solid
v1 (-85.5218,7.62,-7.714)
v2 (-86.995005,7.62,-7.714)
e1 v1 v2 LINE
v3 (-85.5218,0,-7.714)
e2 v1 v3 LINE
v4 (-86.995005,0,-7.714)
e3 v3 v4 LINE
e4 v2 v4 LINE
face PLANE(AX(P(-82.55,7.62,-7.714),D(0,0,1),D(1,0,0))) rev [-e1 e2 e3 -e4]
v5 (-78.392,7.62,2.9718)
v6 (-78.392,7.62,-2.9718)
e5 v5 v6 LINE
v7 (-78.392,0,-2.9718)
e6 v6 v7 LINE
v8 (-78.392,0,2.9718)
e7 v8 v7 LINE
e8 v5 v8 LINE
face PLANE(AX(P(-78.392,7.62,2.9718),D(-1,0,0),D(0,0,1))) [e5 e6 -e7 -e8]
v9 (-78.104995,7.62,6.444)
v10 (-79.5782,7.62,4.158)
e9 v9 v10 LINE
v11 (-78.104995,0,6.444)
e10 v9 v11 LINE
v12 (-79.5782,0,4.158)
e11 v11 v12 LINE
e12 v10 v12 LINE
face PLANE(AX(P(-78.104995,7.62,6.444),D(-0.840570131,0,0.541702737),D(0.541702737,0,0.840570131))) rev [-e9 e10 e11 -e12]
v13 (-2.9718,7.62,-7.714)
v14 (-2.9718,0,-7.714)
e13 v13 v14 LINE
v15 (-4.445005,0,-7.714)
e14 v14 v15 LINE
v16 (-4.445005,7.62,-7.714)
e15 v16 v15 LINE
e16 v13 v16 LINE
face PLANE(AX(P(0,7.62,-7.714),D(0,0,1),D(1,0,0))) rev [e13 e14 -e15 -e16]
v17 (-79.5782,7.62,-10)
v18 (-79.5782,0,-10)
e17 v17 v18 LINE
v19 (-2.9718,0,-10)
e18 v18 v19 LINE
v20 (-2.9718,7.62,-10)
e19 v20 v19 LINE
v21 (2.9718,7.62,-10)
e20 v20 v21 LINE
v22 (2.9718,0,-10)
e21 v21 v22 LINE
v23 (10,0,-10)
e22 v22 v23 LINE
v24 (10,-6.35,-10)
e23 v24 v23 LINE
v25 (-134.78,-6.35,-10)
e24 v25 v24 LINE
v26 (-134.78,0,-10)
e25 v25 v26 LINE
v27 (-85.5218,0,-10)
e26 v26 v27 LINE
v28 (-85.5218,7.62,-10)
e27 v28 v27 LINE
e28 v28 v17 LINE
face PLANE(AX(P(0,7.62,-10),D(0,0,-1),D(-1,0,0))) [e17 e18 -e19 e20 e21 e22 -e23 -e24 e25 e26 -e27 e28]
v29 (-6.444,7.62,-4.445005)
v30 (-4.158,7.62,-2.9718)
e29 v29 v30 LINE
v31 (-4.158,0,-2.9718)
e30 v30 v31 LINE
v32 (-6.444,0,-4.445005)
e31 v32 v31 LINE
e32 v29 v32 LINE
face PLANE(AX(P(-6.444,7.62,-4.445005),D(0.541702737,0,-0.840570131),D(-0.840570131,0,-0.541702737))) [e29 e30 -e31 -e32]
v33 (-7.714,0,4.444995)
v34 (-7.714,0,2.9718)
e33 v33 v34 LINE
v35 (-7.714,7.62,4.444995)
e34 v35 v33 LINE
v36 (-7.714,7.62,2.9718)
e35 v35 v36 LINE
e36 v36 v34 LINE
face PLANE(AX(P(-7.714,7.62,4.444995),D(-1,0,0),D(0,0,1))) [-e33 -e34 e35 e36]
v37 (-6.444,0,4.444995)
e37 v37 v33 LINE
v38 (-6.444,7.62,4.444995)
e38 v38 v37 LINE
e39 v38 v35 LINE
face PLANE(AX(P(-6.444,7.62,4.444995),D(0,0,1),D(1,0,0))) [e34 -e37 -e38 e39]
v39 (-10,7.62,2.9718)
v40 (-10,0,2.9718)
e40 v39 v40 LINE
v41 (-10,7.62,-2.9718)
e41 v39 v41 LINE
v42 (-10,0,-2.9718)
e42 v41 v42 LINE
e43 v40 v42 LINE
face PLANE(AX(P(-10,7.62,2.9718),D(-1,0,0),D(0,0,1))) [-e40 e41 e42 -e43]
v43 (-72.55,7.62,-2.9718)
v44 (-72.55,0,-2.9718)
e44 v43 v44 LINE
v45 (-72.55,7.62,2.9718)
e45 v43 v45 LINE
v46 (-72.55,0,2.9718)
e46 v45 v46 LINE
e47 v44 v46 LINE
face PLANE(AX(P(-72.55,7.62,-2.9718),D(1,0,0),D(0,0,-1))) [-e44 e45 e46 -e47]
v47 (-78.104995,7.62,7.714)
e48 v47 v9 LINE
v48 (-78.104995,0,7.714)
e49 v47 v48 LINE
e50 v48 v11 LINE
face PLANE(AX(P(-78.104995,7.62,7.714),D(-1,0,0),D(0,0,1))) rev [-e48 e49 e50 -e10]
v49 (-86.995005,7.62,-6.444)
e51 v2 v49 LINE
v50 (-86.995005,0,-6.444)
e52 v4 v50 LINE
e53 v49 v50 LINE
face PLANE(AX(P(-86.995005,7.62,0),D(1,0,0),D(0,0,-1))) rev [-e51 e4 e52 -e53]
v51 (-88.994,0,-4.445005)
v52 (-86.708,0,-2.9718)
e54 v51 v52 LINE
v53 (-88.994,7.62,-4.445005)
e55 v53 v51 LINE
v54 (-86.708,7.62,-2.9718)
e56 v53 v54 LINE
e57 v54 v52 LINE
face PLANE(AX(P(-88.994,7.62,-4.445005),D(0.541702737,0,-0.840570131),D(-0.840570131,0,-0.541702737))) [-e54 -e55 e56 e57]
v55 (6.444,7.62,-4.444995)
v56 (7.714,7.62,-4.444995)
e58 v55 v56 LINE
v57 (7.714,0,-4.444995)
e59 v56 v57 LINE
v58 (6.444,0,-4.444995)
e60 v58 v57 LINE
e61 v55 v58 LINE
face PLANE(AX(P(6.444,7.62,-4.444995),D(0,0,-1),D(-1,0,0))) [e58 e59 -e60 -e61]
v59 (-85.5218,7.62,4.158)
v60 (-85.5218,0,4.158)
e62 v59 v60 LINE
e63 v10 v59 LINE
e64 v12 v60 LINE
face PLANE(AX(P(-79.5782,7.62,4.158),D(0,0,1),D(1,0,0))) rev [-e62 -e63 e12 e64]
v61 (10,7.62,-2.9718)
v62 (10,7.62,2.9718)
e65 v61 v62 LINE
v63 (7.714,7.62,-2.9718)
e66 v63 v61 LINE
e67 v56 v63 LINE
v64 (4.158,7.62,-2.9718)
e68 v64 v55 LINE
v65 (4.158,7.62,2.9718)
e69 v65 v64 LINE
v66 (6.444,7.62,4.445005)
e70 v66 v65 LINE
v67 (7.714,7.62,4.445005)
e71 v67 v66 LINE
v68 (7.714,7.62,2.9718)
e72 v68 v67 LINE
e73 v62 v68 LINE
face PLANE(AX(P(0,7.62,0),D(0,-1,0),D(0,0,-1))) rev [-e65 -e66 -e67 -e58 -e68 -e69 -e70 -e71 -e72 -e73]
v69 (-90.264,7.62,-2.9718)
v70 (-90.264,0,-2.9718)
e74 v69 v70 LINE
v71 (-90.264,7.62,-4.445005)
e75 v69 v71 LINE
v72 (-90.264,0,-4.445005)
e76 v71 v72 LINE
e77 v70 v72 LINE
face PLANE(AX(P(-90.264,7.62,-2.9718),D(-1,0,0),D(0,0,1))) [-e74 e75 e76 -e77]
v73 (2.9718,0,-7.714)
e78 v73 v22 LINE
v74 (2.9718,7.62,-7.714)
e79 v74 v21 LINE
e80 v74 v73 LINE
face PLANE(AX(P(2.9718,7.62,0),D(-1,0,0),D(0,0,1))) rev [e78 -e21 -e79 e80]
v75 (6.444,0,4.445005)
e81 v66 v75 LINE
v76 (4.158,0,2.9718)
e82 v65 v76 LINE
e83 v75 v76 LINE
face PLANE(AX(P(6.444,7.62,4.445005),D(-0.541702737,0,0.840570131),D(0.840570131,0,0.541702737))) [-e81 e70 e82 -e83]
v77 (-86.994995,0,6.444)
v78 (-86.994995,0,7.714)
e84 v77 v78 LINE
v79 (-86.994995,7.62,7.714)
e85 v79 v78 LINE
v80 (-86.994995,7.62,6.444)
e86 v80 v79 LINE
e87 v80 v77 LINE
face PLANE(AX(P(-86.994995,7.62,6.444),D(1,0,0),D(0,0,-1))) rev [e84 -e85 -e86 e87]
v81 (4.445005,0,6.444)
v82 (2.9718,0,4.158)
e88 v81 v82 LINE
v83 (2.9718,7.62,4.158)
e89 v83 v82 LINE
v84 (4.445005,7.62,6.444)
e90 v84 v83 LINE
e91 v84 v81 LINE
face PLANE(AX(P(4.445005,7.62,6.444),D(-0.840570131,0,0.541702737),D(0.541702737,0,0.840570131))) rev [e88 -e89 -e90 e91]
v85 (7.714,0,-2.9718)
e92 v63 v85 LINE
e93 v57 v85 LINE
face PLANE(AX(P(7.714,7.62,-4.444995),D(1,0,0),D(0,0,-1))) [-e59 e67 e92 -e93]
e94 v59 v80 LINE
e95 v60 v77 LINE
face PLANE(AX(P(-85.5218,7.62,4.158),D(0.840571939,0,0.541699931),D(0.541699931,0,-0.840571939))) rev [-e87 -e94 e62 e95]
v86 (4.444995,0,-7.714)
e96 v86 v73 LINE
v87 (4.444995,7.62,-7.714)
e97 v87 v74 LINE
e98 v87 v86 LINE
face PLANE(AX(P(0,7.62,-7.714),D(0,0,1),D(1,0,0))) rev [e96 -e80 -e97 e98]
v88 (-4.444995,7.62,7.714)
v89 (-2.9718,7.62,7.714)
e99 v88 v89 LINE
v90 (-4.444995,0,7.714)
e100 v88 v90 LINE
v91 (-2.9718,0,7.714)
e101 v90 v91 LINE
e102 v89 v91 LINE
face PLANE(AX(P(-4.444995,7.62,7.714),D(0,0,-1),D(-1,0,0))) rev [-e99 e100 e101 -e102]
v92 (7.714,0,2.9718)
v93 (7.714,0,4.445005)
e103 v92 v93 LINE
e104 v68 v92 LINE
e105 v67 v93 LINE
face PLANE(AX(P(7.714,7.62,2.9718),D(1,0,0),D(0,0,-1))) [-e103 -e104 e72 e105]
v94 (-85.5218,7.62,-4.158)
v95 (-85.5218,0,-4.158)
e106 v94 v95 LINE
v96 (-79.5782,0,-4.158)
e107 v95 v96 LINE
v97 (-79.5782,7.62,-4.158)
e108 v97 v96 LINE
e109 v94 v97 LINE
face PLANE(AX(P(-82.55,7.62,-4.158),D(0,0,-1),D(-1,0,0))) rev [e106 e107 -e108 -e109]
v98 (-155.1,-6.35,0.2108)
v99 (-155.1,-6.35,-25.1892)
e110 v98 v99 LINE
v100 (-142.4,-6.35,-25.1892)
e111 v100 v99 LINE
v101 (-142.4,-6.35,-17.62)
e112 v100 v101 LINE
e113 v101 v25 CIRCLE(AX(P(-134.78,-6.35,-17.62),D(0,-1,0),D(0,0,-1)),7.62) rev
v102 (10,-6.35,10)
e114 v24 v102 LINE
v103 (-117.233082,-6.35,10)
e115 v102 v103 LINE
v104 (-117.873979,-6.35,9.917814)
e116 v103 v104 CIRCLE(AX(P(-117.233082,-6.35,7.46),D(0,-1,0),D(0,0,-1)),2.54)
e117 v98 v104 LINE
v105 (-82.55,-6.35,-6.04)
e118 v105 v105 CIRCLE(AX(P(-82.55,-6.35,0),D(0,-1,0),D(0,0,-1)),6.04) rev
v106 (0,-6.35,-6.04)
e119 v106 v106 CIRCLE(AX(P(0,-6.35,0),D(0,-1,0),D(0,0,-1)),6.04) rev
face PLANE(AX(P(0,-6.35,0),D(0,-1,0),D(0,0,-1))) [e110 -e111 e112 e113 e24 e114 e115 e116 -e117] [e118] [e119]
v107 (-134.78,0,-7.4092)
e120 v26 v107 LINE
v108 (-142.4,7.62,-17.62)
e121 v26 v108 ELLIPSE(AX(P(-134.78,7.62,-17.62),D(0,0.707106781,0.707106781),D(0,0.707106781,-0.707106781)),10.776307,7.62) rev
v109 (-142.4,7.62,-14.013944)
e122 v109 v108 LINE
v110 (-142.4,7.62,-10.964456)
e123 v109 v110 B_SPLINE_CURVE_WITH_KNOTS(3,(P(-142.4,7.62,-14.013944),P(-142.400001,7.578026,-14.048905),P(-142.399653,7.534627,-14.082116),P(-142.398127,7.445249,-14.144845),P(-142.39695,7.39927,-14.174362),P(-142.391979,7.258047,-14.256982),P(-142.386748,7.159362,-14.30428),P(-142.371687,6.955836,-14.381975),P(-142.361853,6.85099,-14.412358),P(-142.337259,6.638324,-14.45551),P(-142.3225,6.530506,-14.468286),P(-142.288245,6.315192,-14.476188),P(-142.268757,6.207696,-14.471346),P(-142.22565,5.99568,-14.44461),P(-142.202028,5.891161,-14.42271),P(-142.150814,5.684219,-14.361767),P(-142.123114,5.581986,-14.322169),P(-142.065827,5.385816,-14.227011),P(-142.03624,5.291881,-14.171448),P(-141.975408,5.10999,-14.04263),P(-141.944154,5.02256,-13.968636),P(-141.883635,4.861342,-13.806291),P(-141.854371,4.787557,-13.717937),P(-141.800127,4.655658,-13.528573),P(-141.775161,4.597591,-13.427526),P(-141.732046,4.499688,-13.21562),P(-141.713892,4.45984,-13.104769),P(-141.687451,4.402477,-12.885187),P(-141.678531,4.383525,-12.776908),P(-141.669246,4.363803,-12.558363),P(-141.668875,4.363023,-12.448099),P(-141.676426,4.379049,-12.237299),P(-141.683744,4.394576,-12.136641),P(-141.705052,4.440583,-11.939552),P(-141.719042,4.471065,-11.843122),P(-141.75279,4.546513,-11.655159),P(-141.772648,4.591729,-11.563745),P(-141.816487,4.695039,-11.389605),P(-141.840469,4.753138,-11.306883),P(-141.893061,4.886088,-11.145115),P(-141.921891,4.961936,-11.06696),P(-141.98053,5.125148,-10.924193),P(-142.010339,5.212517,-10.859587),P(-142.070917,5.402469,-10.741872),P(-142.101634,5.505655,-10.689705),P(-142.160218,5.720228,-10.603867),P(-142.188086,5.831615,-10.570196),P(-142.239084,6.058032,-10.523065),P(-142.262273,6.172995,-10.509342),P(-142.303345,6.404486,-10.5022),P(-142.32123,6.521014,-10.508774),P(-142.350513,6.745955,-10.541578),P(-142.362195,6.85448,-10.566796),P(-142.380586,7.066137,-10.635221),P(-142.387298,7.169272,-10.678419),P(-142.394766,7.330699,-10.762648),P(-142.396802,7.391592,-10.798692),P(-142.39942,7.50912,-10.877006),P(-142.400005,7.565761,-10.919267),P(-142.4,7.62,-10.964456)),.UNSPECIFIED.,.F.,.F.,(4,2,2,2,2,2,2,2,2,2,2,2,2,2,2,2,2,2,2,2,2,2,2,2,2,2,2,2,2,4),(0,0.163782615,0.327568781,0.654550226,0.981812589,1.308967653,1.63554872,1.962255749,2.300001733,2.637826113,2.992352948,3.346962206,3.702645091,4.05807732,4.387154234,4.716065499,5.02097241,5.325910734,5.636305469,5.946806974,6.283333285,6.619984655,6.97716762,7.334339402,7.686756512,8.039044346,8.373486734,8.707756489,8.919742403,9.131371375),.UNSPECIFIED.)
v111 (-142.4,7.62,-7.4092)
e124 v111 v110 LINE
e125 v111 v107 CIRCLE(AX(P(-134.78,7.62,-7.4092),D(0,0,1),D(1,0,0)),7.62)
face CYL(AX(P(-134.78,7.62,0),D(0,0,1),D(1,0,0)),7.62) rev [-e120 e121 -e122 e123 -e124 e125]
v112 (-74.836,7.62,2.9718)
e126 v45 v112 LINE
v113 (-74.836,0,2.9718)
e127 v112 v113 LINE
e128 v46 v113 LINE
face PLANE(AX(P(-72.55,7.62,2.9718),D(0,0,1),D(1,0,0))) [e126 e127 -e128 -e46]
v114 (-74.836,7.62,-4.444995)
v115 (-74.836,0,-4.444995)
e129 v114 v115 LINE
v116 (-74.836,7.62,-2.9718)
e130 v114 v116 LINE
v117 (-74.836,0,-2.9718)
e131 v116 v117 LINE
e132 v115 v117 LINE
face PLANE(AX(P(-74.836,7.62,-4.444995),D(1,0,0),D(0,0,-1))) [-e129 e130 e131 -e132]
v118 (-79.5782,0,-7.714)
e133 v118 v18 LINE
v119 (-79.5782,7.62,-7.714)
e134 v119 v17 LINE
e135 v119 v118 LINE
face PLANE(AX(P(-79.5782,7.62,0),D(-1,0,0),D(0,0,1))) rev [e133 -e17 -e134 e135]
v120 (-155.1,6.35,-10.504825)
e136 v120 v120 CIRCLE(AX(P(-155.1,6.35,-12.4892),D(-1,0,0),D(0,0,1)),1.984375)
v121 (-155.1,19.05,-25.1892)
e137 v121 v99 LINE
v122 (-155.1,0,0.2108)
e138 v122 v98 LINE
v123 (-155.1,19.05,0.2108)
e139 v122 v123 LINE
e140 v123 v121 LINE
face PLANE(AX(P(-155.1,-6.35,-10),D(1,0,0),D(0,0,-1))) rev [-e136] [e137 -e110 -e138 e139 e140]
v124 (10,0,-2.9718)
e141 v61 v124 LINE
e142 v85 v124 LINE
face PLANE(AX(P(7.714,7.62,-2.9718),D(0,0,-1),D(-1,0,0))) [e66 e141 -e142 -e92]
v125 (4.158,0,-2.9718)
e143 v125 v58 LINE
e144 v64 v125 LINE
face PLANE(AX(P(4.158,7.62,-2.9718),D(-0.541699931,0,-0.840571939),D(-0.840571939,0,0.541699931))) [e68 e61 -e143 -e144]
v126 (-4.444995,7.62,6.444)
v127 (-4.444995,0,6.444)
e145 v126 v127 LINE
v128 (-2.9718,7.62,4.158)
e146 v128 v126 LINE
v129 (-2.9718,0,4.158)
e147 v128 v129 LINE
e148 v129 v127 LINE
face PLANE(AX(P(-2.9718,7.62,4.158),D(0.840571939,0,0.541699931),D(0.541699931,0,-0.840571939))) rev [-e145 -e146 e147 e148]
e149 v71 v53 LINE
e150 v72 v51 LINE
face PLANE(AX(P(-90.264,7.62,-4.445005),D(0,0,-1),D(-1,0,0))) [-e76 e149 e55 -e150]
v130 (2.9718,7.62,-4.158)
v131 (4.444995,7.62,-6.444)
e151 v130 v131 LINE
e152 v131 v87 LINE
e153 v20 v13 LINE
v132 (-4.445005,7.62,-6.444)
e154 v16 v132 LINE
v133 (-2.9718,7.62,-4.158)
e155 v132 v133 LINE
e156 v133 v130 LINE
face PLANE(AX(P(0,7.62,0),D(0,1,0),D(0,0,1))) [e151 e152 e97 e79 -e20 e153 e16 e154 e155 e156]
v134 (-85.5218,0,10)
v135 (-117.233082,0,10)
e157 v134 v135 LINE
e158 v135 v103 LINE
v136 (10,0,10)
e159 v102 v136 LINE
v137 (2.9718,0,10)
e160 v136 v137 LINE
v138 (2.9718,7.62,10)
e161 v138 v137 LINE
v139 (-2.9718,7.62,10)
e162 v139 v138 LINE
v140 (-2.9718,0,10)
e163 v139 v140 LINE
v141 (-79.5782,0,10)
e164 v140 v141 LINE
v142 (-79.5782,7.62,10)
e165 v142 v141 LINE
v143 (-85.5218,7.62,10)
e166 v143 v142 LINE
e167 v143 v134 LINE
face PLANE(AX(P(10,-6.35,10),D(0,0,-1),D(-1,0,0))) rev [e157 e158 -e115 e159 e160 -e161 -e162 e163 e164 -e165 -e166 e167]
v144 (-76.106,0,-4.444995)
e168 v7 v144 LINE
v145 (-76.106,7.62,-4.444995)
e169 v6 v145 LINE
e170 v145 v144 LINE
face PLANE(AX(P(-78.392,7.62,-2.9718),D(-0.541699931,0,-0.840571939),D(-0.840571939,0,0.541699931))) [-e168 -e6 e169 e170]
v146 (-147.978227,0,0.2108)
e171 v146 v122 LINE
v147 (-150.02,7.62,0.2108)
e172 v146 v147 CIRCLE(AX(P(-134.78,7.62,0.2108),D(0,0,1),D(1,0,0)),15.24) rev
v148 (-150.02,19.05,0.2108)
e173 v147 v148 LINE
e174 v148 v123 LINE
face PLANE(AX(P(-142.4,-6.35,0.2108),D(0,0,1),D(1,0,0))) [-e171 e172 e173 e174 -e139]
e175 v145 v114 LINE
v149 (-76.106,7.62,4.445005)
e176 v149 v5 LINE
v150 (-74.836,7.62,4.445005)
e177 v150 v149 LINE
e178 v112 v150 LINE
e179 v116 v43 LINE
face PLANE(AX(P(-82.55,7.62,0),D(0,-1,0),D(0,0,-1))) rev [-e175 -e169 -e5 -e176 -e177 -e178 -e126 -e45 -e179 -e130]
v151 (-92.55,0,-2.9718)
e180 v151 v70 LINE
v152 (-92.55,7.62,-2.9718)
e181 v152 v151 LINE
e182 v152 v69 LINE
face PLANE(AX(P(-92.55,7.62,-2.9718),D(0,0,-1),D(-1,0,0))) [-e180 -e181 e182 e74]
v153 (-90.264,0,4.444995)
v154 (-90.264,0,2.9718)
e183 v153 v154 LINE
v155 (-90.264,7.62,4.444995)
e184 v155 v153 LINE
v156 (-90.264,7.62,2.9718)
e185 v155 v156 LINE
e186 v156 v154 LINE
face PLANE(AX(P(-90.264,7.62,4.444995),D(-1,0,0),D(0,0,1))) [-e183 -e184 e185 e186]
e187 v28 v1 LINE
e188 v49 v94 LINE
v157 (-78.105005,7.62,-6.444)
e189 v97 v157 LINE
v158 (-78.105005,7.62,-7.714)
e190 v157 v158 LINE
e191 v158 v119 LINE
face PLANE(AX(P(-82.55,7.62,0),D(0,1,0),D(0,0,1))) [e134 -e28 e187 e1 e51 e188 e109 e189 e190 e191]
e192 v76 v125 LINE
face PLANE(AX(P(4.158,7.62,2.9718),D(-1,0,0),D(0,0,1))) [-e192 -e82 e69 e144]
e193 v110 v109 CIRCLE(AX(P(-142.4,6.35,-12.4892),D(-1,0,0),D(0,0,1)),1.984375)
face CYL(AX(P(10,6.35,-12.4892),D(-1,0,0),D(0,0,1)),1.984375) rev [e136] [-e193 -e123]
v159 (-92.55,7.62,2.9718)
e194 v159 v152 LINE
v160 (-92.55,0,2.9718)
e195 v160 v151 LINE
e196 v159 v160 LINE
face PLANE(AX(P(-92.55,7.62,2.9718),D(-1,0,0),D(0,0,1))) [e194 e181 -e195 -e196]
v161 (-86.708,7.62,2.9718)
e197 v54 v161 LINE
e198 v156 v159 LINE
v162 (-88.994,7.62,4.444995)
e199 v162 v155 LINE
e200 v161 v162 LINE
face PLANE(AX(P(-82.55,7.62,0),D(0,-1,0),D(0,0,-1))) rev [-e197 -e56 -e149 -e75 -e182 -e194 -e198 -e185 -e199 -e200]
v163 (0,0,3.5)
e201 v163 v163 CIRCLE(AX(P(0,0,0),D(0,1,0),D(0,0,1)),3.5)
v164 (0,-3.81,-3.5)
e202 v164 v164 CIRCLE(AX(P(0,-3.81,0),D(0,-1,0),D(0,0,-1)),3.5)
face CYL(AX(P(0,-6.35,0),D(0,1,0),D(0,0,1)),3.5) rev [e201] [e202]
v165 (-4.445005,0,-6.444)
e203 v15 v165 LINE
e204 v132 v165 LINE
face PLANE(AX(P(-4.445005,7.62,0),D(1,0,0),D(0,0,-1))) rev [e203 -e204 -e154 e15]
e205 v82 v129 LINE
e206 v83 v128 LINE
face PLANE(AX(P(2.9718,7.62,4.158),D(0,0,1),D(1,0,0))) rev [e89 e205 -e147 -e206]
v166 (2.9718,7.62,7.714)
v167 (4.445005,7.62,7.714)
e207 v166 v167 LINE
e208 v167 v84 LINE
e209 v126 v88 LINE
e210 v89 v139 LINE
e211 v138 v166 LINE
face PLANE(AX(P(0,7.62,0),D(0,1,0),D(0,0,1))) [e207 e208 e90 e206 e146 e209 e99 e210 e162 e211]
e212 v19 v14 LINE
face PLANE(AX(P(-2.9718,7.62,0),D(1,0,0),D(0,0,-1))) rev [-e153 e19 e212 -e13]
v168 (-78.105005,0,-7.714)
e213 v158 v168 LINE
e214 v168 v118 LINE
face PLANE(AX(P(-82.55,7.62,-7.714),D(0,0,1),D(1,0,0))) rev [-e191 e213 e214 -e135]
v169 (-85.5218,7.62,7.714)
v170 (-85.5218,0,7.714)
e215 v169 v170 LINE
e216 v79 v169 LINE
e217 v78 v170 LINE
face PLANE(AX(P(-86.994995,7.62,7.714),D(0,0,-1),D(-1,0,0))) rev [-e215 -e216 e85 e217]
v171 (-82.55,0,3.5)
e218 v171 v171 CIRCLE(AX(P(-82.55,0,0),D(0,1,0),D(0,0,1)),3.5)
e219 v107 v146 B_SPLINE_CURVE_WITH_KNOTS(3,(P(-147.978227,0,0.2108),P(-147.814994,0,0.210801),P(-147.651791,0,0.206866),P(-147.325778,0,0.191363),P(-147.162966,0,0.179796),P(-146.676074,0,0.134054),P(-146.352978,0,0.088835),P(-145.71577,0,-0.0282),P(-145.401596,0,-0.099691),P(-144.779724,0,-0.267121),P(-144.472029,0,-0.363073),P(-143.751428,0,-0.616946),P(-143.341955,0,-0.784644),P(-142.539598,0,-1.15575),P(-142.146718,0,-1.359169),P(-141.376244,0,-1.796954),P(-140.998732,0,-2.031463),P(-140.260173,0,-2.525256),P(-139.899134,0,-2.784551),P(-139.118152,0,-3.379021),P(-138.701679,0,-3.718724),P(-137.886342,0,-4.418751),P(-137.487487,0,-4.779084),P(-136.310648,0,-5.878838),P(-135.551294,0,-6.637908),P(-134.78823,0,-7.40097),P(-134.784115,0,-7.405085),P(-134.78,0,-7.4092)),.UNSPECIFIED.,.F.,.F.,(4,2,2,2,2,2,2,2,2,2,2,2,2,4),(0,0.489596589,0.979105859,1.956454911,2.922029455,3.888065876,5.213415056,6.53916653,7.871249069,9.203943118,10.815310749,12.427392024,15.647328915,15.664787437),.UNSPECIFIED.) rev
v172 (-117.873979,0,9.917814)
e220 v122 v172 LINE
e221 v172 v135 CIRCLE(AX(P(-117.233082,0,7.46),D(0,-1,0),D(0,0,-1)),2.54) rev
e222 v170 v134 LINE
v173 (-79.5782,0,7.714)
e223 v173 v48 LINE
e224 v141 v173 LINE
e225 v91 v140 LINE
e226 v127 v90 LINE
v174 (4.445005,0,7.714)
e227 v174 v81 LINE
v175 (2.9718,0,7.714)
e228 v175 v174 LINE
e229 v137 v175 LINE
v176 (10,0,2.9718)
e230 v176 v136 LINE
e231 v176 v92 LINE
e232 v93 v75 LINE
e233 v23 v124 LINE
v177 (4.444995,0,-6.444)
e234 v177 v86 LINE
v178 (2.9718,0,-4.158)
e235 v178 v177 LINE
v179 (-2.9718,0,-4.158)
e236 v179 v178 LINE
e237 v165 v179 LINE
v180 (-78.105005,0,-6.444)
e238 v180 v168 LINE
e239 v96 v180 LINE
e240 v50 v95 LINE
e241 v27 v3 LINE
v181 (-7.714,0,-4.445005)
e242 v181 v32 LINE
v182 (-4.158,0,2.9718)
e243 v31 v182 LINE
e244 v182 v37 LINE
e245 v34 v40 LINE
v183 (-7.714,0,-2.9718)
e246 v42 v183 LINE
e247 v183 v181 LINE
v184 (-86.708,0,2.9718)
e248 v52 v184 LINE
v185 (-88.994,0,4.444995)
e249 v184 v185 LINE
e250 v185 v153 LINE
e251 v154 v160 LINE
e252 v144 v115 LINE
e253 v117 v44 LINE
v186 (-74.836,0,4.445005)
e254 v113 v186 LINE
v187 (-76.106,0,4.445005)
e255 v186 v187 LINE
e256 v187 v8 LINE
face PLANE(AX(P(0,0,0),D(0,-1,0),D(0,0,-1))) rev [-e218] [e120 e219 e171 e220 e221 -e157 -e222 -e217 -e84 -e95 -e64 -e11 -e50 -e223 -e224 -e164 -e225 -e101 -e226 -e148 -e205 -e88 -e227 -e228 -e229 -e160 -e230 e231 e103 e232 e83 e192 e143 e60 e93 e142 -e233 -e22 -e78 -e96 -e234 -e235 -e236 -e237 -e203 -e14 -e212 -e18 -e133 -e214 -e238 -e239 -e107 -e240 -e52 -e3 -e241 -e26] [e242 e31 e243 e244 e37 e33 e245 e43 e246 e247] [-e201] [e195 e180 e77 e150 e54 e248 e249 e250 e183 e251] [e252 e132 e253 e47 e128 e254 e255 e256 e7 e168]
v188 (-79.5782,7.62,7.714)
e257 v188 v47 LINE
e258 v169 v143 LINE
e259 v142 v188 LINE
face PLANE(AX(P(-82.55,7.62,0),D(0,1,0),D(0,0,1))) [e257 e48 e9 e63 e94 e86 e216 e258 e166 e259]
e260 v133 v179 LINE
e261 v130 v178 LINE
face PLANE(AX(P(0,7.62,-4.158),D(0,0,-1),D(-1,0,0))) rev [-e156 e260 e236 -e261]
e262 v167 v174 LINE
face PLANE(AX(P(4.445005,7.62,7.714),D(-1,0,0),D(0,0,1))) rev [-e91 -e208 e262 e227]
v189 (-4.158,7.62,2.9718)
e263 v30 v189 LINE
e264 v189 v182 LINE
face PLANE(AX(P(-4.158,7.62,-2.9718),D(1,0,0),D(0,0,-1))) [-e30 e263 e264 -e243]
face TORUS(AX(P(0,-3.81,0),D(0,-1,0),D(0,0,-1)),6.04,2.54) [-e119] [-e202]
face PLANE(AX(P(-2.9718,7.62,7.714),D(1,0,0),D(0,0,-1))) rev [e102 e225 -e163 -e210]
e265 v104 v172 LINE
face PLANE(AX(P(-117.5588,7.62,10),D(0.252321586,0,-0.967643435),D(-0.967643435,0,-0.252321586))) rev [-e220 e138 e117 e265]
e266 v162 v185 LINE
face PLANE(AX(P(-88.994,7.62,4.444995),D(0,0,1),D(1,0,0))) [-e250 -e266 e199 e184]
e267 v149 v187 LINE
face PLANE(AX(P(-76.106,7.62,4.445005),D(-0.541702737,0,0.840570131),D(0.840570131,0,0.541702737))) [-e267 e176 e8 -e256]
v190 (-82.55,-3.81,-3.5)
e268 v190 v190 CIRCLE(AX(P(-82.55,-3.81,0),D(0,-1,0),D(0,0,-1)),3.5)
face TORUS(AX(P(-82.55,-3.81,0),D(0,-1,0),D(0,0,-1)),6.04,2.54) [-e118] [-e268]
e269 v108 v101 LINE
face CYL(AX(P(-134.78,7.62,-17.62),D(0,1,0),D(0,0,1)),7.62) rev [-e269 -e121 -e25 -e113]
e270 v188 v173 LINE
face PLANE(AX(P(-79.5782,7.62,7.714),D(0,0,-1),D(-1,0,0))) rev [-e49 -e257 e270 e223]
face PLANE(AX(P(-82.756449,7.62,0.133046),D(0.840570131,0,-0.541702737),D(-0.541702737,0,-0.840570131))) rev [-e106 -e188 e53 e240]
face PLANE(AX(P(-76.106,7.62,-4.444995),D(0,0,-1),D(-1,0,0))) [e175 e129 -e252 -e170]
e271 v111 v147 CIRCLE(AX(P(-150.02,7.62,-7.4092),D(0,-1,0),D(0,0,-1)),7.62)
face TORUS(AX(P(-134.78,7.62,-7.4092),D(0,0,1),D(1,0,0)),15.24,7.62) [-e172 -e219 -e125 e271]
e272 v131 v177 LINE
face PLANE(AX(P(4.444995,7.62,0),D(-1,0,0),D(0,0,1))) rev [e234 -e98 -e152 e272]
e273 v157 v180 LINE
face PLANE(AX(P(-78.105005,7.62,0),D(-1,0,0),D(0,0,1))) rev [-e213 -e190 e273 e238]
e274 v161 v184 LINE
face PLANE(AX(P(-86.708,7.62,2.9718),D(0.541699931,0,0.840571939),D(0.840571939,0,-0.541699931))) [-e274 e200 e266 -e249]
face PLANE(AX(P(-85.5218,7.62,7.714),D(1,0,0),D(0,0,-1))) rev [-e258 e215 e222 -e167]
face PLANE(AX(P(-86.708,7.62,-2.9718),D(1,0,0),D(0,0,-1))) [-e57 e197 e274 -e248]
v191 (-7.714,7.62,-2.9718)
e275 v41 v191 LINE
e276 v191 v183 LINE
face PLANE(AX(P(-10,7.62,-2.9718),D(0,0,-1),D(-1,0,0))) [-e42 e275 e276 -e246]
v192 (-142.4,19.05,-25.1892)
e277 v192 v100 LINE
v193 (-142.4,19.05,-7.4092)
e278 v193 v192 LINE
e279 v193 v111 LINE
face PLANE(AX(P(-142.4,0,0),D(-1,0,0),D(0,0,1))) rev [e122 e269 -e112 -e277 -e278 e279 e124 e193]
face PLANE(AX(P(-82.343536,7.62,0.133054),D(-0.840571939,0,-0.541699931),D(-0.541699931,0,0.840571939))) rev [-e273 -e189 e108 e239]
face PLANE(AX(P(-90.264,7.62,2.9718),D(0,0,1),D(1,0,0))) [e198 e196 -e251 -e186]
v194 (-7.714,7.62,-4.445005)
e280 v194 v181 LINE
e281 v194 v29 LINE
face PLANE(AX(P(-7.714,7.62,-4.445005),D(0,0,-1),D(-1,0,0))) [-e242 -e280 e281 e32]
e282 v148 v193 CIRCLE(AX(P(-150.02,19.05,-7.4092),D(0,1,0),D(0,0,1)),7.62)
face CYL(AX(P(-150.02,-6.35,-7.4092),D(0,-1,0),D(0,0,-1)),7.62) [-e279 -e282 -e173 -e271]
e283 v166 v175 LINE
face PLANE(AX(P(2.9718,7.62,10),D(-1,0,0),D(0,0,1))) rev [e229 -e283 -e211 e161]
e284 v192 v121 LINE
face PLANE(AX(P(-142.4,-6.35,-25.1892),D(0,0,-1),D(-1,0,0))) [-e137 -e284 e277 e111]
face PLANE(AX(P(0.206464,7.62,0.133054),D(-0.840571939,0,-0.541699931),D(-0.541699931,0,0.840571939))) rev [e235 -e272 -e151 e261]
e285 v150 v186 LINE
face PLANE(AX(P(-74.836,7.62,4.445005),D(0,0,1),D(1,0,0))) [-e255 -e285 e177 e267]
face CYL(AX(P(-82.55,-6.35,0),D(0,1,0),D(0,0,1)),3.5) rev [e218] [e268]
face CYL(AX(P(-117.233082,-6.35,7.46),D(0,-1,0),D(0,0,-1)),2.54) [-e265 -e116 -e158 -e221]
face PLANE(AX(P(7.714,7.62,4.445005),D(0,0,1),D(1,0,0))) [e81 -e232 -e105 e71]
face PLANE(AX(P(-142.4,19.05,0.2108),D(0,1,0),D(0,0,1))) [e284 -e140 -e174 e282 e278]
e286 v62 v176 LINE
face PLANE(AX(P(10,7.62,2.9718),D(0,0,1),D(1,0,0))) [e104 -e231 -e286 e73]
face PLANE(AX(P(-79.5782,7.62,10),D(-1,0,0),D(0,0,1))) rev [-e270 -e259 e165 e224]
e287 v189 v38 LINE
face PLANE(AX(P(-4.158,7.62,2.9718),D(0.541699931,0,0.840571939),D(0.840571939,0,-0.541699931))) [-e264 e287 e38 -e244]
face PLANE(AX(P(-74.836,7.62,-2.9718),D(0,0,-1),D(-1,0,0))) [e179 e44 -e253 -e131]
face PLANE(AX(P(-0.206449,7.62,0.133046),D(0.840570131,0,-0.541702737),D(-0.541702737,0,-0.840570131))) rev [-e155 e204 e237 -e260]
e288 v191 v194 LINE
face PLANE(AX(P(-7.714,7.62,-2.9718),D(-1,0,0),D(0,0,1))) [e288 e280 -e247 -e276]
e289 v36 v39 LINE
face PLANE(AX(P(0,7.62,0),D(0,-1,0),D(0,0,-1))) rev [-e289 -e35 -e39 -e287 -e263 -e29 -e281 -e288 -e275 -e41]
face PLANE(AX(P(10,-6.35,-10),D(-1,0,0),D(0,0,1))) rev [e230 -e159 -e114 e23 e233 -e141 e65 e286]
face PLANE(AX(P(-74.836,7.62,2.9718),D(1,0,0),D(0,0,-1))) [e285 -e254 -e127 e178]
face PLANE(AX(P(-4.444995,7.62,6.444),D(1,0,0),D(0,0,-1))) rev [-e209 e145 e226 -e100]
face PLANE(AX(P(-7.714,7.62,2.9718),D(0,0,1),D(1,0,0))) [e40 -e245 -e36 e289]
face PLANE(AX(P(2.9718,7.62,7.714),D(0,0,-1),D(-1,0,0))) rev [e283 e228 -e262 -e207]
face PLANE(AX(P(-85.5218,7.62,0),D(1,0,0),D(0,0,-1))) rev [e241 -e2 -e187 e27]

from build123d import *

# Parameters (mm, degrees)
BOSS_EXTRUDE1_DEPTH   = 7.62
BOSS_EXTRUDE1_2_DEPTH = 7.62
BOSS_EXTRUDE1_3_DEPTH = 7.62
BOSS_EXTRUDE1_4_DEPTH = 7.62
SKETCH2_W             = 165.1
SKETCH2_H             = 20
BOSS_EXTRUDE2_DEPTH   = 6.35
LPATTERN2_COUNT       = 2
LPATTERN2_PITCH       = 82.55
CUT_EXTRUDE1_DEPTH    = 157.048617104
FILLET1_R             = 2.54
SKETCH6_W             = 25.4
SKETCH6_H             = 25.4
BOSS_EXTRUDE7_DEPTH   = 12.7
FILLET3_R             = 7.62
FILLET5_R             = 7.62
SKETCH11_R            = 1.984375
CUT_EXTRUDE3_DEPTH    = 169.09345118
SKETCH13_R            = 3.5
CUT_EXTRUDE5_DEPTH    = 159.282684864
FILLET6_R             = 2.54


with BuildPart() as part:
    # Sketch1 → Boss-Extrude1 (new body)
    with BuildSketch(Plane(origin=(0, 0, 0), x_dir=(1, 0, 0), z_dir=(0, 1, 0))):
        Polygon((-2.9718, 10), (-2.9718, 7.714), (-4.4450054, 7.714), (-4.4450054, 6.444), (-2.9718, 4.158), (2.9718, 4.158), (4.4449946, 6.444), (4.4449946, 7.714), (2.9718, 7.714), (2.9718, 10), align=None)
    boss_extrude1 = extrude(amount=BOSS_EXTRUDE1_DEPTH)



with BuildPart() as body_2:
    # Sketch1 → Boss-Extrude1 2 (new body)
    with BuildSketch(Plane(origin=(0, 0, 0), x_dir=(1, 0, 0), z_dir=(0, 1, 0))):
        Polygon((4.158, -2.9718), (4.158, 2.9718), (6.444, 4.4449946), (7.714, 4.4449946), (7.714, 2.9718), (10, 2.9718), (10, -2.9718), (7.714, -2.9718), (7.714, -4.4450054), (6.444, -4.4450054), align=None)
    boss_extrude1_2 = extrude(amount=BOSS_EXTRUDE1_2_DEPTH)


with BuildPart() as body_3:
    # Sketch1 → Boss-Extrude1 3 (new body)
    with BuildSketch(Plane(origin=(0, 0, 0), x_dir=(1, 0, 0), z_dir=(0, 1, 0))):
        Polygon((4.4450054, -6.444), (2.9718, -4.158), (-2.9718, -4.158), (-4.4449946, -6.444), (-4.4449946, -7.714), (-2.9718, -7.714), (-2.9718, -10), (2.9718, -10), (2.9718, -7.714), (4.4450054, -7.714), align=None)
    boss_extrude1_3 = extrude(amount=BOSS_EXTRUDE1_3_DEPTH)


with BuildPart() as body_4:
    # Sketch1 → Boss-Extrude1 4 (new body)
    with BuildSketch(Plane(origin=(0, 0, 0), x_dir=(1, 0, 0), z_dir=(0, 1, 0))):
        Polygon((-10, -2.9718), (-10, 2.9718), (-7.714, 2.9718), (-7.714, 4.4450054), (-6.444, 4.4450054), (-4.158, 2.9718), (-4.158, -2.9718), (-6.444, -4.4449946), (-7.714, -4.4449946), (-7.714, -2.9718), align=None)
    boss_extrude1_4 = extrude(amount=BOSS_EXTRUDE1_4_DEPTH)


with BuildPart() as part_1:
    add(part.part)

    add(body_2.part)  # Boss-Extrude2 merges body 2

    add(body_3.part)  # Boss-Extrude2 merges body 3

    add(body_4.part)  # Boss-Extrude2 merges body 4
    # Sketch2 → Boss-Extrude2 (add)
    with BuildSketch(Plane.XZ):
        with Locations((-72.55, 0)):
            Rectangle(SKETCH2_W, SKETCH2_H)
    extrude(amount=BOSS_EXTRUDE2_DEPTH)

    # LPattern2: Boss-Extrude1, Boss-Extrude1 2, Boss-Extrude1 3, Boss-Extrude1 4 ×2
    with Locations(*[(-i * LPATTERN2_PITCH, 0, 0) for i in range(1, LPATTERN2_COUNT)]):
        add(boss_extrude1)
        add(boss_extrude1_2)
        add(boss_extrude1_3)
        add(boss_extrude1_4)

    # Sketch4 → Cut-Extrude1 (cut, through all)
    with BuildSketch(Plane(origin=(0, -6.35, 0), x_dir=(-1, 0, 0), z_dir=(0, -1, 0))):
        Polygon((155.1, -10), (117.5588, -10), (155.1, -0.2108), align=None)
    extrude(amount=-CUT_EXTRUDE1_DEPTH, mode=Mode.SUBTRACT)

    # Fillet1
    fillet1_edges = [part_1.edges().sort_by_distance(p)[0] for p in [
        (-117.5588, -3.175, 10),
    ]]
    fillet(fillet1_edges, radius=FILLET1_R)

    # Sketch6 → Boss-Extrude7 (add)
    with BuildSketch(Plane.ZY.offset(155.1)):
        with Locations((-12.4892, 6.35)):
            Rectangle(SKETCH6_W, SKETCH6_H)
    extrude(amount=-BOSS_EXTRUDE7_DEPTH)

    # Fillet3
    fillet3_edges = [part_1.edges().sort_by_distance(p)[0] for p in [
        (-142.4, 0, -4.8946),
        (-142.4, -3.175, -10),
    ]]
    fillet(fillet3_edges, radius=FILLET3_R)

    # Fillet5
    # the kernel refuses this fillet: 7.62 mm, written as the material it takes off along each edge
    with BuildSketch(Plane(origin=(-142.4, 38.1, 0.2108), x_dir=(-1, 0, 0), z_dir=(0, -1, 0))) as fillet5_piece_1:
        with BuildLine():
            CenterArc((FILLET5_R, FILLET5_R), FILLET5_R, 180, 90)
            Line((0, FILLET5_R), (0, 0))
            Line((0, 0), (FILLET5_R, 0))
        make_face()
    extrude(amount=30.48, mode=Mode.SUBTRACT)
    with BuildSketch(Plane(origin=(-134.78, 7.62, 0.2108), x_dir=(0.5976672776328269, 0.8017442392976487, 0), z_dir=(-0.8017442392976487, 0.5976672776328269, 0))) as fillet5_piece_2_section:
        with BuildLine():
            CenterArc((7.62 + FILLET5_R, FILLET5_R), FILLET5_R, 180, 90)
            Line((7.62, FILLET5_R), (7.62, 0))
            Line((7.62, 0), (7.62 + FILLET5_R, 0))
        make_face()
    fillet5_piece_2 = revolve(axis=Axis((-134.78, 7.62, 0.2108), (0, 0, -1)), revolution_arc=233.296989237, mode=Mode.PRIVATE)
    fillet5_piece_2 = split(fillet5_piece_2, bisect_by=Plane(origin=(-140.494534821, 0, -2.163807691), z_dir=(0, 1, 0)), keep=Keep.TOP, mode=Mode.PRIVATE)
    add(fillet5_piece_2, mode=Mode.SUBTRACT)

    # Sketch11 → Cut-Extrude3 (cut, through all)
    with BuildSketch(Plane.ZY.offset(155.1)):
        with Locations((-12.4892, 6.35)):
            Circle(SKETCH11_R)
    extrude(amount=-CUT_EXTRUDE3_DEPTH, mode=Mode.SUBTRACT)

    # Sketch13 → Cut-Extrude5 (cut, through all)
    with BuildSketch(Plane(origin=(0, 0, 0), x_dir=(1, 0, 0), z_dir=(0, 1, 0))):
        with Locations(Location((0, 0, 0), (0, 0, 270))):
            Circle(SKETCH13_R)
        with Locations(Location((-82.55, 0, 0), (0, 0, 270))):
            Circle(SKETCH13_R)
    extrude(amount=-CUT_EXTRUDE5_DEPTH, mode=Mode.SUBTRACT)

    # Fillet6
    fillet6_edges = [part_1.edges().sort_by_distance(p)[0] for p in [
        (0, -6.35, -3.5),
        (-82.55, -6.35, -3.5),
    ]]
    fillet(fillet6_edges, radius=FILLET6_R)


solid = part_1.part
